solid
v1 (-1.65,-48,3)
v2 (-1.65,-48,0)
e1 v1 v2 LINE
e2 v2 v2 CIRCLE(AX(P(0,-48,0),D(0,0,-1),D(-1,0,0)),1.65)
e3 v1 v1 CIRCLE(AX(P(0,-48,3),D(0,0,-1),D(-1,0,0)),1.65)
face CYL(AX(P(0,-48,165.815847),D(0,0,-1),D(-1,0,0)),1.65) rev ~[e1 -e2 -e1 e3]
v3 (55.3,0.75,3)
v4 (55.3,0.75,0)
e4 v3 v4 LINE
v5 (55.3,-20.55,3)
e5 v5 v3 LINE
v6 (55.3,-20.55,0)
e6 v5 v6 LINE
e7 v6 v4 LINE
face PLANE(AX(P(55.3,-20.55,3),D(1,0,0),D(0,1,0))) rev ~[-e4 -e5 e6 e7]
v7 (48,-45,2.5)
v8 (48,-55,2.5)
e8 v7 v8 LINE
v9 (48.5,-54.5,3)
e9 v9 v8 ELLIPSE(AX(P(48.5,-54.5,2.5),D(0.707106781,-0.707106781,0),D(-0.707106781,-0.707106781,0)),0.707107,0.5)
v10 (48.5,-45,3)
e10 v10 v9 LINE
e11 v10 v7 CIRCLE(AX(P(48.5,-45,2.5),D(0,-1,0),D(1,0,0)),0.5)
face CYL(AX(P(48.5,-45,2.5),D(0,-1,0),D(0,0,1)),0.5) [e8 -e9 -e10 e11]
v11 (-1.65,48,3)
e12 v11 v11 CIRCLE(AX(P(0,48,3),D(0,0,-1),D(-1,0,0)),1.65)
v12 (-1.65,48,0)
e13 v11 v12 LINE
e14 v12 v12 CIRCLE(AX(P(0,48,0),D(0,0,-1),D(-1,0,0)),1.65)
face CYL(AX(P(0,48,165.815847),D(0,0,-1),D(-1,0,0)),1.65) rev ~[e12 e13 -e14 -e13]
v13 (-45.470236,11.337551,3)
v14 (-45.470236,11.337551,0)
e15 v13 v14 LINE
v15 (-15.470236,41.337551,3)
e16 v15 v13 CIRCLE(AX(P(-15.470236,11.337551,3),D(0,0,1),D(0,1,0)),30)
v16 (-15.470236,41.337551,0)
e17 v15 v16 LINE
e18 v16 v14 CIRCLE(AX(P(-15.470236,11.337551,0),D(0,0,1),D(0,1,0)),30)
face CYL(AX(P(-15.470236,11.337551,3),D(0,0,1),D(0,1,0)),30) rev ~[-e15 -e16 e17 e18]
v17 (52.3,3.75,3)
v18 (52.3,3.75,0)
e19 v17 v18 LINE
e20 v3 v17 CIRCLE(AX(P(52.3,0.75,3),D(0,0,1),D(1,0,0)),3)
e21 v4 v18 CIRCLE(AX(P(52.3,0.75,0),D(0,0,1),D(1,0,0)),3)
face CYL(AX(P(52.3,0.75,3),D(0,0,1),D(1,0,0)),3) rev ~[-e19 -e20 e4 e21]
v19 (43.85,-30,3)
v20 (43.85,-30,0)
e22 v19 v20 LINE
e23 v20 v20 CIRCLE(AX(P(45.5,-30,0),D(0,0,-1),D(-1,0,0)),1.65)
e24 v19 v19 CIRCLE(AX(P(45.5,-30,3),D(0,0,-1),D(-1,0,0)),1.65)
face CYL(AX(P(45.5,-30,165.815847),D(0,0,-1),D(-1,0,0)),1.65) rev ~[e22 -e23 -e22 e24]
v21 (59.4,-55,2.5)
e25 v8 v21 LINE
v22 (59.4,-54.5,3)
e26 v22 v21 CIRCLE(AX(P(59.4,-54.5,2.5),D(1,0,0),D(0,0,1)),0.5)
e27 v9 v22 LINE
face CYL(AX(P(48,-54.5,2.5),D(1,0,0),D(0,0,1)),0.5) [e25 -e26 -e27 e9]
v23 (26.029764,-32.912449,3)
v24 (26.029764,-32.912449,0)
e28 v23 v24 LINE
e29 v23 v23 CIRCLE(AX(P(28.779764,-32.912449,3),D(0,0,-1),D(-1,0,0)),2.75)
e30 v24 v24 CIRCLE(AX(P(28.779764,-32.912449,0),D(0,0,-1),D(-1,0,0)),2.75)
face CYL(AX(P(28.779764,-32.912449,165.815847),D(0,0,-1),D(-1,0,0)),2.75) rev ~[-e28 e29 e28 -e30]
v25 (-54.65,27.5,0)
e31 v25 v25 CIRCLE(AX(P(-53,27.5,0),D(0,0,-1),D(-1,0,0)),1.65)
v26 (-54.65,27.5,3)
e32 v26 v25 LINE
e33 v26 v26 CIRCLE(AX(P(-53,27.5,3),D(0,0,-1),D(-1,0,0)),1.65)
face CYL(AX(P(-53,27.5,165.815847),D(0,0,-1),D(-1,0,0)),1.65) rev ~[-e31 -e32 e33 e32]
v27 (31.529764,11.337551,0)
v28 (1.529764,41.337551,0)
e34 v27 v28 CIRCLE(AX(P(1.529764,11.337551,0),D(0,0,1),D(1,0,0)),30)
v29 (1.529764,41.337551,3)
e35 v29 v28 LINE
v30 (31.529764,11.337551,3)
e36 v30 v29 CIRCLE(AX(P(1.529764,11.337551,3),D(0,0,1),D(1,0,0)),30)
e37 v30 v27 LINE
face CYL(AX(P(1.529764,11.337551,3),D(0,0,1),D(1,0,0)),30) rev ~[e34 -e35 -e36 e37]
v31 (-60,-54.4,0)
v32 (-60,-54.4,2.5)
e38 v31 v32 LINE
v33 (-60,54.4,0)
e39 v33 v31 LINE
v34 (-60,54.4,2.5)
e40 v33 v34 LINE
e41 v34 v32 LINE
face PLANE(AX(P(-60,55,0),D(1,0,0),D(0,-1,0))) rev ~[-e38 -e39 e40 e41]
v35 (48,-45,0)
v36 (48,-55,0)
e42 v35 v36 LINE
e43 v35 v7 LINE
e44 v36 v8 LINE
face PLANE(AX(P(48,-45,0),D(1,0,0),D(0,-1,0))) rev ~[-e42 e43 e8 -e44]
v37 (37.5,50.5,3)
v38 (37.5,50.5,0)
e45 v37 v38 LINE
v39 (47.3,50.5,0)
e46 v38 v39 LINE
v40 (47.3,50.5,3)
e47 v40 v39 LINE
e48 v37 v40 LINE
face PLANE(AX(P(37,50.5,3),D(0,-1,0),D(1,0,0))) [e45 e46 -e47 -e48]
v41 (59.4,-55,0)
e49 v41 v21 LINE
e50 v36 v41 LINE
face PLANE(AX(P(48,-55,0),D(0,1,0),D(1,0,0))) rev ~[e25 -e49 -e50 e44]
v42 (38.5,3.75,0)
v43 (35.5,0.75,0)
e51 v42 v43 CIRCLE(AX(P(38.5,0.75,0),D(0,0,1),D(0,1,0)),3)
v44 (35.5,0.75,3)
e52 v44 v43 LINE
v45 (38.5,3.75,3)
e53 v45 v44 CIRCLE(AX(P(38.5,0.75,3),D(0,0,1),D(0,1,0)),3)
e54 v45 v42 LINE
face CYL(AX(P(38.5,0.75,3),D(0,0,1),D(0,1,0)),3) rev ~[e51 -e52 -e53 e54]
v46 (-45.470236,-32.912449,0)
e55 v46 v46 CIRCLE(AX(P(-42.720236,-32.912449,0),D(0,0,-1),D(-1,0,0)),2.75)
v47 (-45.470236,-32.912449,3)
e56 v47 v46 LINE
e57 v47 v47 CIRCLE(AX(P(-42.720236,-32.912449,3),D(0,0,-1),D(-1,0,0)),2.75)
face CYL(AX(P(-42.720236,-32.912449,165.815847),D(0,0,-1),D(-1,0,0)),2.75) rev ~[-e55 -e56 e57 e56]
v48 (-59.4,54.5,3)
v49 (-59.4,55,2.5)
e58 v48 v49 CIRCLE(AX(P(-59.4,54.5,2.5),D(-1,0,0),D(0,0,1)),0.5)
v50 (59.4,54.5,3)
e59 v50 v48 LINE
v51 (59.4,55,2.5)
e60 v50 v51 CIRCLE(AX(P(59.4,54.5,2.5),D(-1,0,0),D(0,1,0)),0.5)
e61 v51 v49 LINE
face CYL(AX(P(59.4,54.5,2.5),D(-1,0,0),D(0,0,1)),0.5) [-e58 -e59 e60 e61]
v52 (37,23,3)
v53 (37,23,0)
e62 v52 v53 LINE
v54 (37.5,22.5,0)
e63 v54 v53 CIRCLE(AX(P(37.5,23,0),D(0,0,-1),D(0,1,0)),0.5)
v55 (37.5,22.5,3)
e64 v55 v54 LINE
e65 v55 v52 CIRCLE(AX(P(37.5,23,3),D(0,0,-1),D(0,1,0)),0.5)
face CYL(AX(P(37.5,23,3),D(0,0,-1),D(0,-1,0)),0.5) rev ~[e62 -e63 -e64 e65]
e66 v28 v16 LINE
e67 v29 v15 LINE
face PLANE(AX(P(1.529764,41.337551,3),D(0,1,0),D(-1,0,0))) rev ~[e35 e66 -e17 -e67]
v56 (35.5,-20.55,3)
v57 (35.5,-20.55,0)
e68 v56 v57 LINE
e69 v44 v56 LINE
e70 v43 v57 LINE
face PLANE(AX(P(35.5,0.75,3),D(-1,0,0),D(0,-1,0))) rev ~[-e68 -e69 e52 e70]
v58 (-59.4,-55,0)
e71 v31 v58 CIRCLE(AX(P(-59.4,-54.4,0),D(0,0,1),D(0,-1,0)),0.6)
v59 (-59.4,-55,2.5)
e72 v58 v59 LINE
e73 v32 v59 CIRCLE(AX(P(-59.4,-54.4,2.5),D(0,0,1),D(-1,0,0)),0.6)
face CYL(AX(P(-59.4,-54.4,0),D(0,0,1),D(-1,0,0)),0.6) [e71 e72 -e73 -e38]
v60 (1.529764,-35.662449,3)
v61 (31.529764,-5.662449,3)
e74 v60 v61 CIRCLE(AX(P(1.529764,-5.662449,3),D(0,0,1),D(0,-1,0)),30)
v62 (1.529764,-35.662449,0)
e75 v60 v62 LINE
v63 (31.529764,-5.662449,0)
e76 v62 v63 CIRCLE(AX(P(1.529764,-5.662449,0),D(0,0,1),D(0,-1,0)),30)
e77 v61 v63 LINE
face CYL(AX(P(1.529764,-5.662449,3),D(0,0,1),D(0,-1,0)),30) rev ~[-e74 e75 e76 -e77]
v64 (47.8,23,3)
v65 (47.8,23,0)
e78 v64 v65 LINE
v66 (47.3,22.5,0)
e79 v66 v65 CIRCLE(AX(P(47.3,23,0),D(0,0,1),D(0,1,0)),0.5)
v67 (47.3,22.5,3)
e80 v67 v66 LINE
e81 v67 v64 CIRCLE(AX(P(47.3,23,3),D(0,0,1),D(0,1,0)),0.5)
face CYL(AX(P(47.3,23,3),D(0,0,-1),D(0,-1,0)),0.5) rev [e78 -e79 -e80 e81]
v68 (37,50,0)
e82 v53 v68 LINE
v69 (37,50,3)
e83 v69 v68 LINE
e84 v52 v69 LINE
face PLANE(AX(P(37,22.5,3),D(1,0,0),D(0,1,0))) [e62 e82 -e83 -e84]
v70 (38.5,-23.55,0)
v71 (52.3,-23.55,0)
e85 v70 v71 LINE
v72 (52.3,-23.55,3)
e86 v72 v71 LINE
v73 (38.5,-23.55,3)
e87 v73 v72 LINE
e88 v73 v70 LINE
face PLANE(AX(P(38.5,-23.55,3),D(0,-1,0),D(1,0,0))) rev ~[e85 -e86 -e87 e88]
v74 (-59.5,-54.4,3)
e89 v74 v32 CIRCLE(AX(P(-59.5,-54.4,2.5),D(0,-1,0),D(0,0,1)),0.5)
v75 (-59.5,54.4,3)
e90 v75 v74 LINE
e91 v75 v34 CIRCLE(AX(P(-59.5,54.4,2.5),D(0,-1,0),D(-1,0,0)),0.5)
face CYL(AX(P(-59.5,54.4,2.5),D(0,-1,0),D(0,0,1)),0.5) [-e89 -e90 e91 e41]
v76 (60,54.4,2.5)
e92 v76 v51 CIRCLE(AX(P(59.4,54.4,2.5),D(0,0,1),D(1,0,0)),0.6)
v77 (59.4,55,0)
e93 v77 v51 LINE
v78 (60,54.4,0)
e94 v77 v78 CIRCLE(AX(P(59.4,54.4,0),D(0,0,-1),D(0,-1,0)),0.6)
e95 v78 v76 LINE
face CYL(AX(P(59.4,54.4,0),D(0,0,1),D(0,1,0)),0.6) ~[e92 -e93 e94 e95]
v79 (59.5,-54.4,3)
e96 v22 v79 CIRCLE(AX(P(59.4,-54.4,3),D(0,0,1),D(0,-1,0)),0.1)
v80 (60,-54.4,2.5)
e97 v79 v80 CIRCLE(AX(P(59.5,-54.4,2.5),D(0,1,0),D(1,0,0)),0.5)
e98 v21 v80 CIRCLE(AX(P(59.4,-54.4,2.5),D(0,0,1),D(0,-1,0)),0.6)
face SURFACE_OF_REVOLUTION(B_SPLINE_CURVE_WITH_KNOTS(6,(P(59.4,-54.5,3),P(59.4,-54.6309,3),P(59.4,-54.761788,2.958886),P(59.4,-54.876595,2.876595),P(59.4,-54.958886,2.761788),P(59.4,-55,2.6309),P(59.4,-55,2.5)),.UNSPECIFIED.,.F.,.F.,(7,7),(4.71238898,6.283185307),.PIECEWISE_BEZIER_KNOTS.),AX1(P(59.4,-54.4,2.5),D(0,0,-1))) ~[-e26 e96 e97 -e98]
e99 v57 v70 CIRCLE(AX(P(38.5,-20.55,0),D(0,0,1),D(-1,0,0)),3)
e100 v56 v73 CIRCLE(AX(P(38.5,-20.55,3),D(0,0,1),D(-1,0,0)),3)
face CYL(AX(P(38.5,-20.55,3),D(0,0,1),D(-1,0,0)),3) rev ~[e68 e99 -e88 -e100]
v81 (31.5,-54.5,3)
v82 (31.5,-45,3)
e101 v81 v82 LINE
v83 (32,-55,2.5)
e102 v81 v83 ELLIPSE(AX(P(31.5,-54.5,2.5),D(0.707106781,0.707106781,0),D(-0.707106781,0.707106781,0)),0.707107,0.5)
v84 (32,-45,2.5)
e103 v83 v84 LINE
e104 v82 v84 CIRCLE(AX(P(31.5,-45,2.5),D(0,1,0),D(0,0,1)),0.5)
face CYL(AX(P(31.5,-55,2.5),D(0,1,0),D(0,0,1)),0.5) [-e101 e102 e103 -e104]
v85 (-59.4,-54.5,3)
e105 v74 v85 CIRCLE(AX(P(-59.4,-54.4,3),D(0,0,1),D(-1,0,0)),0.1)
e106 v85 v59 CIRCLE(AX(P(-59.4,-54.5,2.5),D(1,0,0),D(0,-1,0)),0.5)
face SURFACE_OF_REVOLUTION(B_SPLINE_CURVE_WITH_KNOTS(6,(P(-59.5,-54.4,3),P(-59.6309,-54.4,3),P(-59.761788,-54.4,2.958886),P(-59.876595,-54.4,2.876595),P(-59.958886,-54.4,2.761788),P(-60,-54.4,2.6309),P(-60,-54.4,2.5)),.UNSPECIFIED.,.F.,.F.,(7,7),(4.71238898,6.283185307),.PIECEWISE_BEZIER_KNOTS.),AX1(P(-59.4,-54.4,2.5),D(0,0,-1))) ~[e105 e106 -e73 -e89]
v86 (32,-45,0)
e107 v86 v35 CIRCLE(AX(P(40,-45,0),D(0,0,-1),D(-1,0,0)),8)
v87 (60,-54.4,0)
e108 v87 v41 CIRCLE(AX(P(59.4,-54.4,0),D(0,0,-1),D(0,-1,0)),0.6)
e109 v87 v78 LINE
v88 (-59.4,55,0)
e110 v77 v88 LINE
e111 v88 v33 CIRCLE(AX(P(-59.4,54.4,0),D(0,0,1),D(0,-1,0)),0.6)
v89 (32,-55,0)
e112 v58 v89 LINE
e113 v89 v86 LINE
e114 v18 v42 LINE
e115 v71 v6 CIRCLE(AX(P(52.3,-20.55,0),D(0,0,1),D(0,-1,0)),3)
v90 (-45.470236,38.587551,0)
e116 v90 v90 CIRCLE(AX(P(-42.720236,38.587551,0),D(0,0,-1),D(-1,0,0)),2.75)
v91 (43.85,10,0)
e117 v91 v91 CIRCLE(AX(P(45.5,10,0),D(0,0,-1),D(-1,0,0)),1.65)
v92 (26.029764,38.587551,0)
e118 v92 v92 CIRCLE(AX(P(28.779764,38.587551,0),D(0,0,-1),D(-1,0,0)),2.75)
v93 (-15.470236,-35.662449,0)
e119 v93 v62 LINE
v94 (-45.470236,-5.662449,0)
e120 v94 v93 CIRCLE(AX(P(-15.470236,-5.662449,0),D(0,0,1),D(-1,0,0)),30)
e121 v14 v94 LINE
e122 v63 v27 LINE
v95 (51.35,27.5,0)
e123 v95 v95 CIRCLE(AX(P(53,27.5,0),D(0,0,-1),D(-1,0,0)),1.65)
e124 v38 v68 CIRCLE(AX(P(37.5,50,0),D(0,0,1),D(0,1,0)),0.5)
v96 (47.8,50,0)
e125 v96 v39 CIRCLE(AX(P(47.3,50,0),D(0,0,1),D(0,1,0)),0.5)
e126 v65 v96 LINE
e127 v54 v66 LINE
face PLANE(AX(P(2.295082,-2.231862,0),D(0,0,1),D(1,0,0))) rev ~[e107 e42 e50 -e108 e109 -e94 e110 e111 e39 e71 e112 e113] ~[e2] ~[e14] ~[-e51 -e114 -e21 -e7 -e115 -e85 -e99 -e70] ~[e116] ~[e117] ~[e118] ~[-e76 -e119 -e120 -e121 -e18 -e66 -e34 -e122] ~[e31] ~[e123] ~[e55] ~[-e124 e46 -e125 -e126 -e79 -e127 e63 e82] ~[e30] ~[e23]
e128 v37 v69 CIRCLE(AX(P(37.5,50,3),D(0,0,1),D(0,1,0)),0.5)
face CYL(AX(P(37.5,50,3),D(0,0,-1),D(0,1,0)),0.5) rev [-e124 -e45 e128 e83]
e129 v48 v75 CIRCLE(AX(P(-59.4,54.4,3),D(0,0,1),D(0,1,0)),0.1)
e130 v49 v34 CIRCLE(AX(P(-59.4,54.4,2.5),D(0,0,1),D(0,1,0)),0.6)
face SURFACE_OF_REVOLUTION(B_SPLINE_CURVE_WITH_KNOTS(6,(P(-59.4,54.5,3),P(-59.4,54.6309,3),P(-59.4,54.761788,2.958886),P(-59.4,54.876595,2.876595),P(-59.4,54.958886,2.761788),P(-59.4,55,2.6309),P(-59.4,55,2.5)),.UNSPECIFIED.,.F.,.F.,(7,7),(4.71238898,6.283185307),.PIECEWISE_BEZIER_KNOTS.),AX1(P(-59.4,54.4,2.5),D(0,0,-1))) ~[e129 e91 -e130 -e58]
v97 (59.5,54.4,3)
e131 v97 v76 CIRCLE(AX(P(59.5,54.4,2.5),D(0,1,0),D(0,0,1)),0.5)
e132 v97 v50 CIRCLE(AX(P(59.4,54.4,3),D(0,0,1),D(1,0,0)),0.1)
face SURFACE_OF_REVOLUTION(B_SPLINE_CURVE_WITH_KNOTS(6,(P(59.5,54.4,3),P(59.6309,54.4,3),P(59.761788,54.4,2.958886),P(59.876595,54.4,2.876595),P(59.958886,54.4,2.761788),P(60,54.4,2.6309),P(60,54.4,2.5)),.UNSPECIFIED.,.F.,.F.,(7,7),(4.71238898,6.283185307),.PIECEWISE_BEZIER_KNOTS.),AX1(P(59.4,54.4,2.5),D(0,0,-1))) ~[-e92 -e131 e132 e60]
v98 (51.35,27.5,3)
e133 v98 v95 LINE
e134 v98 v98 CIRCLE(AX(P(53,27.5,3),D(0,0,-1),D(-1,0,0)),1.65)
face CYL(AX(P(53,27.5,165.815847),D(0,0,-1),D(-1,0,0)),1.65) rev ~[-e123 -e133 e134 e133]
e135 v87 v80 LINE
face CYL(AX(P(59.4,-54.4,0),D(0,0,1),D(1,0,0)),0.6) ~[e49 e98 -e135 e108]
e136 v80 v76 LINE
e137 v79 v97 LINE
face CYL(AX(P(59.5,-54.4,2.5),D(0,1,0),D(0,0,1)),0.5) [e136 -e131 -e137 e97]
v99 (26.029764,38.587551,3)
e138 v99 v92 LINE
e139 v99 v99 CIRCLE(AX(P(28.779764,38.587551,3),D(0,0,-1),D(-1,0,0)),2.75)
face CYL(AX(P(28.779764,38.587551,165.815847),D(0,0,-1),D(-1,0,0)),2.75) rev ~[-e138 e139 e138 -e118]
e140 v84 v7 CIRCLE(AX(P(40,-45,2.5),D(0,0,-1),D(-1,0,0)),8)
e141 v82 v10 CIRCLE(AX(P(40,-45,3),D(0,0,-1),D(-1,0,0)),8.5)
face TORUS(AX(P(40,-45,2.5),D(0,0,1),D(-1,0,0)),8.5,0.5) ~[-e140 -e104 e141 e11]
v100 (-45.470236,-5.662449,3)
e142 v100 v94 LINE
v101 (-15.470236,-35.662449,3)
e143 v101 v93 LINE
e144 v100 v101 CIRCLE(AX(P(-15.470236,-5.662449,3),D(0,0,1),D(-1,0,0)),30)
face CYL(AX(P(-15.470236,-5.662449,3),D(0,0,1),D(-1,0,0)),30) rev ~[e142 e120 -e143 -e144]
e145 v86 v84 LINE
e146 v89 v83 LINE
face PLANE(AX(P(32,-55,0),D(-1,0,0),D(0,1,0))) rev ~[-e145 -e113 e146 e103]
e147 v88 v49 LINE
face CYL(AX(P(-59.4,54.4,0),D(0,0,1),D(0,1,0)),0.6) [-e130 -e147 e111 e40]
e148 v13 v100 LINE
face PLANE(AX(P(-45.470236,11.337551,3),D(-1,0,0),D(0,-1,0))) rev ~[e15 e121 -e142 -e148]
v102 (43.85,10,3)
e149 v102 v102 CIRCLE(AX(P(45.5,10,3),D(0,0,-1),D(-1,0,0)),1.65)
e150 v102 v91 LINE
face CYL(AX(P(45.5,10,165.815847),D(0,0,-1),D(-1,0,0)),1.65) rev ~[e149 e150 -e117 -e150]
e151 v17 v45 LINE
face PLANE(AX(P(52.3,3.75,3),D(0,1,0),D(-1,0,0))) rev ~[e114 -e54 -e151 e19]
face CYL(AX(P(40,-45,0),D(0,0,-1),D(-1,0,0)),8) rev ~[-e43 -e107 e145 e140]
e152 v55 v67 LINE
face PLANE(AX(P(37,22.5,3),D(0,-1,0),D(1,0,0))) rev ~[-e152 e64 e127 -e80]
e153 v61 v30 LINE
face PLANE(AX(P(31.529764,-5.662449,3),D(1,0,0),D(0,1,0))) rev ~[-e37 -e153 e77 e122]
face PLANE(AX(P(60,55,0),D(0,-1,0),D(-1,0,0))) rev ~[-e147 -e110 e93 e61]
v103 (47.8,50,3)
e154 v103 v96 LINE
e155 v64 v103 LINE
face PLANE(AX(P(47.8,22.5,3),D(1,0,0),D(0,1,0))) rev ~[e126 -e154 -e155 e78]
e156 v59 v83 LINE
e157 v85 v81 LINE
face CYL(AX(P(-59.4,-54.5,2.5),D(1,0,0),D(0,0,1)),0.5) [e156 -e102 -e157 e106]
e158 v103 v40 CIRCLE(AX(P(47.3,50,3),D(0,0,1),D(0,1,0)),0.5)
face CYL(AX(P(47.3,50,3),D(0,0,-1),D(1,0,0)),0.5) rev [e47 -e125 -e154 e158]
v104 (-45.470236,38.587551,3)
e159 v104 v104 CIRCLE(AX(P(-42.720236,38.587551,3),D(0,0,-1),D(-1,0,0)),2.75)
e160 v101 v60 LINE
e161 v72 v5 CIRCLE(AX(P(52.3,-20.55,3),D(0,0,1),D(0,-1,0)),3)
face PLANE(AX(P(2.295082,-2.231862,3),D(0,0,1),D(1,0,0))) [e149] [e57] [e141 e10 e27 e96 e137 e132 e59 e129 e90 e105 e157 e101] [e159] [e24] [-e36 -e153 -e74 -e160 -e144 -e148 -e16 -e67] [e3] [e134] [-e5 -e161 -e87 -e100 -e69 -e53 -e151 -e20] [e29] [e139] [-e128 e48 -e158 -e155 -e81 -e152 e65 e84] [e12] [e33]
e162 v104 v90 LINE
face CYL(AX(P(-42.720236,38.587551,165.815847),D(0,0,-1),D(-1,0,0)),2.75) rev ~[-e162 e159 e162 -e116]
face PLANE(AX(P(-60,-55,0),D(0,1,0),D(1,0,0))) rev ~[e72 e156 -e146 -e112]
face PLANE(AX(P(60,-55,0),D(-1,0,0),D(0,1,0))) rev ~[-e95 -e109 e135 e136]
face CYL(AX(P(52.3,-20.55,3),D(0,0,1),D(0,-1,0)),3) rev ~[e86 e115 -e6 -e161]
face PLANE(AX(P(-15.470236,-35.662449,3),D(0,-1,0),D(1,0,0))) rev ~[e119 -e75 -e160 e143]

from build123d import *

# Parameters (mm, degrees)
F1_DEPTH  = 3
F3_D      = 3.3
F5_D      = 5.5
F6_DEPTH  = 3.001
F7_R      = 0.6
F8_R      = 0.5
F10_D     = 3.3
F11_DEPTH = 3.001
F12_W     = 10.8
F12_H     = 28
F13_DEPTH = 3.001
F14_R     = 0.5


# Not quite as in the source:
# - a feature names something its author has since deleted; it is built from what else it names


with BuildPart() as f1:
    # F0 (on Top) → F1 (new body)
    with BuildSketch(Plane.XY):
        with BuildLine():
            Line((60, 55), (-60, 55))
            Line((-60, 55), (-60, -55))
            Line((-60, -55), (32, -55))
            Line((32, -55), (32, -45))
            ThreePointArc((32, -45), (40, -37), (48, -45))
            Line((48, -45), (48, -55))
            Line((48, -55), (60, -55))
            Line((60, -55), (60, 55))
        make_face()
    extrude(amount=F1_DEPTH)

    # F3 (through all)
    with Locations(Plane.XY.offset(3)):
        with Locations((-53, 27.5), (0, 48), (53, 27.5), (0, -48)):
            Hole(F3_D / 2)

    # F5 (through all)
    with Locations(Plane.XY.offset(3)):
        with Locations((-42.7202362838, 38.5875506155), (-42.7202362838, -32.9124493845), (28.7797637162, -32.9124493845), (28.7797637162, 38.5875506155)):
            Hole(F5_D / 2)

    # F4 (on face) → F6 (cut, through all)
    with BuildSketch(Plane.XY.offset(3)):
        with BuildLine():
            ThreePointArc((31.5297637162, 11.3375506155), (22.7429671518, 32.5507540511), (1.5297637162, 41.3375506155))
            Line((1.5297637162, 41.3375506155), (-15.4702362838, 41.3375506155))
            ThreePointArc((-15.4702362838, 41.3375506155), (-36.6834397194, 32.5507540511), (-45.4702362838, 11.3375506155))
            Line((-45.4702362838, 11.3375506155), (-45.4702362838, -5.6624493845))
            ThreePointArc((-45.4702362838, -5.6624493845), (-36.6834397194, -26.8756528201), (-15.4702362838, -35.6624493845))
            Line((-15.4702362838, -35.6624493845), (1.5297637162, -35.6624493845))
            ThreePointArc((1.5297637162, -35.6624493845), (22.7429671518, -26.8756528201), (31.5297637162, -5.6624493845))
            Line((31.5297637162, -5.6624493845), (31.5297637162, 11.3375506155))
        make_face()
    extrude(amount=-F6_DEPTH, mode=Mode.SUBTRACT)

    # F7
    f7_edges = [f1.edges().sort_by_distance(p)[0] for p in [
        (-60, 55, 1.5),
        (60, 55, 1.5),
        (60, -55, 1.5),
        (-60, -55, 1.5),
    ]]
    fillet(f7_edges, radius=F7_R)

    # F8
    f8_edges = [f1.edges().sort_by_distance(p)[0] for p in [
        (40, -37, 3),
        (-13.7, -55, 3),
    ]]
    fillet(f8_edges, radius=F8_R)

    # F10 (through all)
    with Locations(Plane.XY.offset(3)):
        with Locations((45.5, 10), (45.5, -30)):
            Hole(F10_D / 2)

    # F9 (on face) → F11 (cut, through all)
    with BuildSketch(Plane.XY.offset(3)):
        with BuildLine():
            Line((52.3, 3.75), (38.5, 3.75))
            ThreePointArc((38.5, 3.75), (36.3786796564, 2.8713203436), (35.5, 0.75))
            Line((35.5, 0.75), (35.5, -20.55))
            ThreePointArc((35.5, -20.55), (36.3786796564, -22.6713203436), (38.5, -23.55))
            Line((38.5, -23.55), (52.3, -23.55))
            ThreePointArc((52.3, -23.55), (54.4213203436, -22.6713203436), (55.3, -20.55))
            Line((55.3, -20.55), (55.3, 0.75))
            ThreePointArc((55.3, 0.75), (54.4213203436, 2.8713203436), (52.3, 3.75))
        make_face()
    extrude(amount=-F11_DEPTH, mode=Mode.SUBTRACT)

    # F12 (on face) → F13 (cut, through all)
    with BuildSketch(Plane.XY.offset(3)):
        with Locations((42.4, 36.5)):
            Rectangle(F12_W, F12_H)
    extrude(amount=-F13_DEPTH, mode=Mode.SUBTRACT)

    # F14
    f14_edges = [f1.edges().sort_by_distance(p)[0] for p in [
        (37, 22.5, 1.5),
        (37, 50.5, 1.5),
        (47.8, 50.5, 1.5),
        (47.8, 22.5, 1.5),
    ]]
    fillet(f14_edges, radius=F14_R)


solid = f1.part
